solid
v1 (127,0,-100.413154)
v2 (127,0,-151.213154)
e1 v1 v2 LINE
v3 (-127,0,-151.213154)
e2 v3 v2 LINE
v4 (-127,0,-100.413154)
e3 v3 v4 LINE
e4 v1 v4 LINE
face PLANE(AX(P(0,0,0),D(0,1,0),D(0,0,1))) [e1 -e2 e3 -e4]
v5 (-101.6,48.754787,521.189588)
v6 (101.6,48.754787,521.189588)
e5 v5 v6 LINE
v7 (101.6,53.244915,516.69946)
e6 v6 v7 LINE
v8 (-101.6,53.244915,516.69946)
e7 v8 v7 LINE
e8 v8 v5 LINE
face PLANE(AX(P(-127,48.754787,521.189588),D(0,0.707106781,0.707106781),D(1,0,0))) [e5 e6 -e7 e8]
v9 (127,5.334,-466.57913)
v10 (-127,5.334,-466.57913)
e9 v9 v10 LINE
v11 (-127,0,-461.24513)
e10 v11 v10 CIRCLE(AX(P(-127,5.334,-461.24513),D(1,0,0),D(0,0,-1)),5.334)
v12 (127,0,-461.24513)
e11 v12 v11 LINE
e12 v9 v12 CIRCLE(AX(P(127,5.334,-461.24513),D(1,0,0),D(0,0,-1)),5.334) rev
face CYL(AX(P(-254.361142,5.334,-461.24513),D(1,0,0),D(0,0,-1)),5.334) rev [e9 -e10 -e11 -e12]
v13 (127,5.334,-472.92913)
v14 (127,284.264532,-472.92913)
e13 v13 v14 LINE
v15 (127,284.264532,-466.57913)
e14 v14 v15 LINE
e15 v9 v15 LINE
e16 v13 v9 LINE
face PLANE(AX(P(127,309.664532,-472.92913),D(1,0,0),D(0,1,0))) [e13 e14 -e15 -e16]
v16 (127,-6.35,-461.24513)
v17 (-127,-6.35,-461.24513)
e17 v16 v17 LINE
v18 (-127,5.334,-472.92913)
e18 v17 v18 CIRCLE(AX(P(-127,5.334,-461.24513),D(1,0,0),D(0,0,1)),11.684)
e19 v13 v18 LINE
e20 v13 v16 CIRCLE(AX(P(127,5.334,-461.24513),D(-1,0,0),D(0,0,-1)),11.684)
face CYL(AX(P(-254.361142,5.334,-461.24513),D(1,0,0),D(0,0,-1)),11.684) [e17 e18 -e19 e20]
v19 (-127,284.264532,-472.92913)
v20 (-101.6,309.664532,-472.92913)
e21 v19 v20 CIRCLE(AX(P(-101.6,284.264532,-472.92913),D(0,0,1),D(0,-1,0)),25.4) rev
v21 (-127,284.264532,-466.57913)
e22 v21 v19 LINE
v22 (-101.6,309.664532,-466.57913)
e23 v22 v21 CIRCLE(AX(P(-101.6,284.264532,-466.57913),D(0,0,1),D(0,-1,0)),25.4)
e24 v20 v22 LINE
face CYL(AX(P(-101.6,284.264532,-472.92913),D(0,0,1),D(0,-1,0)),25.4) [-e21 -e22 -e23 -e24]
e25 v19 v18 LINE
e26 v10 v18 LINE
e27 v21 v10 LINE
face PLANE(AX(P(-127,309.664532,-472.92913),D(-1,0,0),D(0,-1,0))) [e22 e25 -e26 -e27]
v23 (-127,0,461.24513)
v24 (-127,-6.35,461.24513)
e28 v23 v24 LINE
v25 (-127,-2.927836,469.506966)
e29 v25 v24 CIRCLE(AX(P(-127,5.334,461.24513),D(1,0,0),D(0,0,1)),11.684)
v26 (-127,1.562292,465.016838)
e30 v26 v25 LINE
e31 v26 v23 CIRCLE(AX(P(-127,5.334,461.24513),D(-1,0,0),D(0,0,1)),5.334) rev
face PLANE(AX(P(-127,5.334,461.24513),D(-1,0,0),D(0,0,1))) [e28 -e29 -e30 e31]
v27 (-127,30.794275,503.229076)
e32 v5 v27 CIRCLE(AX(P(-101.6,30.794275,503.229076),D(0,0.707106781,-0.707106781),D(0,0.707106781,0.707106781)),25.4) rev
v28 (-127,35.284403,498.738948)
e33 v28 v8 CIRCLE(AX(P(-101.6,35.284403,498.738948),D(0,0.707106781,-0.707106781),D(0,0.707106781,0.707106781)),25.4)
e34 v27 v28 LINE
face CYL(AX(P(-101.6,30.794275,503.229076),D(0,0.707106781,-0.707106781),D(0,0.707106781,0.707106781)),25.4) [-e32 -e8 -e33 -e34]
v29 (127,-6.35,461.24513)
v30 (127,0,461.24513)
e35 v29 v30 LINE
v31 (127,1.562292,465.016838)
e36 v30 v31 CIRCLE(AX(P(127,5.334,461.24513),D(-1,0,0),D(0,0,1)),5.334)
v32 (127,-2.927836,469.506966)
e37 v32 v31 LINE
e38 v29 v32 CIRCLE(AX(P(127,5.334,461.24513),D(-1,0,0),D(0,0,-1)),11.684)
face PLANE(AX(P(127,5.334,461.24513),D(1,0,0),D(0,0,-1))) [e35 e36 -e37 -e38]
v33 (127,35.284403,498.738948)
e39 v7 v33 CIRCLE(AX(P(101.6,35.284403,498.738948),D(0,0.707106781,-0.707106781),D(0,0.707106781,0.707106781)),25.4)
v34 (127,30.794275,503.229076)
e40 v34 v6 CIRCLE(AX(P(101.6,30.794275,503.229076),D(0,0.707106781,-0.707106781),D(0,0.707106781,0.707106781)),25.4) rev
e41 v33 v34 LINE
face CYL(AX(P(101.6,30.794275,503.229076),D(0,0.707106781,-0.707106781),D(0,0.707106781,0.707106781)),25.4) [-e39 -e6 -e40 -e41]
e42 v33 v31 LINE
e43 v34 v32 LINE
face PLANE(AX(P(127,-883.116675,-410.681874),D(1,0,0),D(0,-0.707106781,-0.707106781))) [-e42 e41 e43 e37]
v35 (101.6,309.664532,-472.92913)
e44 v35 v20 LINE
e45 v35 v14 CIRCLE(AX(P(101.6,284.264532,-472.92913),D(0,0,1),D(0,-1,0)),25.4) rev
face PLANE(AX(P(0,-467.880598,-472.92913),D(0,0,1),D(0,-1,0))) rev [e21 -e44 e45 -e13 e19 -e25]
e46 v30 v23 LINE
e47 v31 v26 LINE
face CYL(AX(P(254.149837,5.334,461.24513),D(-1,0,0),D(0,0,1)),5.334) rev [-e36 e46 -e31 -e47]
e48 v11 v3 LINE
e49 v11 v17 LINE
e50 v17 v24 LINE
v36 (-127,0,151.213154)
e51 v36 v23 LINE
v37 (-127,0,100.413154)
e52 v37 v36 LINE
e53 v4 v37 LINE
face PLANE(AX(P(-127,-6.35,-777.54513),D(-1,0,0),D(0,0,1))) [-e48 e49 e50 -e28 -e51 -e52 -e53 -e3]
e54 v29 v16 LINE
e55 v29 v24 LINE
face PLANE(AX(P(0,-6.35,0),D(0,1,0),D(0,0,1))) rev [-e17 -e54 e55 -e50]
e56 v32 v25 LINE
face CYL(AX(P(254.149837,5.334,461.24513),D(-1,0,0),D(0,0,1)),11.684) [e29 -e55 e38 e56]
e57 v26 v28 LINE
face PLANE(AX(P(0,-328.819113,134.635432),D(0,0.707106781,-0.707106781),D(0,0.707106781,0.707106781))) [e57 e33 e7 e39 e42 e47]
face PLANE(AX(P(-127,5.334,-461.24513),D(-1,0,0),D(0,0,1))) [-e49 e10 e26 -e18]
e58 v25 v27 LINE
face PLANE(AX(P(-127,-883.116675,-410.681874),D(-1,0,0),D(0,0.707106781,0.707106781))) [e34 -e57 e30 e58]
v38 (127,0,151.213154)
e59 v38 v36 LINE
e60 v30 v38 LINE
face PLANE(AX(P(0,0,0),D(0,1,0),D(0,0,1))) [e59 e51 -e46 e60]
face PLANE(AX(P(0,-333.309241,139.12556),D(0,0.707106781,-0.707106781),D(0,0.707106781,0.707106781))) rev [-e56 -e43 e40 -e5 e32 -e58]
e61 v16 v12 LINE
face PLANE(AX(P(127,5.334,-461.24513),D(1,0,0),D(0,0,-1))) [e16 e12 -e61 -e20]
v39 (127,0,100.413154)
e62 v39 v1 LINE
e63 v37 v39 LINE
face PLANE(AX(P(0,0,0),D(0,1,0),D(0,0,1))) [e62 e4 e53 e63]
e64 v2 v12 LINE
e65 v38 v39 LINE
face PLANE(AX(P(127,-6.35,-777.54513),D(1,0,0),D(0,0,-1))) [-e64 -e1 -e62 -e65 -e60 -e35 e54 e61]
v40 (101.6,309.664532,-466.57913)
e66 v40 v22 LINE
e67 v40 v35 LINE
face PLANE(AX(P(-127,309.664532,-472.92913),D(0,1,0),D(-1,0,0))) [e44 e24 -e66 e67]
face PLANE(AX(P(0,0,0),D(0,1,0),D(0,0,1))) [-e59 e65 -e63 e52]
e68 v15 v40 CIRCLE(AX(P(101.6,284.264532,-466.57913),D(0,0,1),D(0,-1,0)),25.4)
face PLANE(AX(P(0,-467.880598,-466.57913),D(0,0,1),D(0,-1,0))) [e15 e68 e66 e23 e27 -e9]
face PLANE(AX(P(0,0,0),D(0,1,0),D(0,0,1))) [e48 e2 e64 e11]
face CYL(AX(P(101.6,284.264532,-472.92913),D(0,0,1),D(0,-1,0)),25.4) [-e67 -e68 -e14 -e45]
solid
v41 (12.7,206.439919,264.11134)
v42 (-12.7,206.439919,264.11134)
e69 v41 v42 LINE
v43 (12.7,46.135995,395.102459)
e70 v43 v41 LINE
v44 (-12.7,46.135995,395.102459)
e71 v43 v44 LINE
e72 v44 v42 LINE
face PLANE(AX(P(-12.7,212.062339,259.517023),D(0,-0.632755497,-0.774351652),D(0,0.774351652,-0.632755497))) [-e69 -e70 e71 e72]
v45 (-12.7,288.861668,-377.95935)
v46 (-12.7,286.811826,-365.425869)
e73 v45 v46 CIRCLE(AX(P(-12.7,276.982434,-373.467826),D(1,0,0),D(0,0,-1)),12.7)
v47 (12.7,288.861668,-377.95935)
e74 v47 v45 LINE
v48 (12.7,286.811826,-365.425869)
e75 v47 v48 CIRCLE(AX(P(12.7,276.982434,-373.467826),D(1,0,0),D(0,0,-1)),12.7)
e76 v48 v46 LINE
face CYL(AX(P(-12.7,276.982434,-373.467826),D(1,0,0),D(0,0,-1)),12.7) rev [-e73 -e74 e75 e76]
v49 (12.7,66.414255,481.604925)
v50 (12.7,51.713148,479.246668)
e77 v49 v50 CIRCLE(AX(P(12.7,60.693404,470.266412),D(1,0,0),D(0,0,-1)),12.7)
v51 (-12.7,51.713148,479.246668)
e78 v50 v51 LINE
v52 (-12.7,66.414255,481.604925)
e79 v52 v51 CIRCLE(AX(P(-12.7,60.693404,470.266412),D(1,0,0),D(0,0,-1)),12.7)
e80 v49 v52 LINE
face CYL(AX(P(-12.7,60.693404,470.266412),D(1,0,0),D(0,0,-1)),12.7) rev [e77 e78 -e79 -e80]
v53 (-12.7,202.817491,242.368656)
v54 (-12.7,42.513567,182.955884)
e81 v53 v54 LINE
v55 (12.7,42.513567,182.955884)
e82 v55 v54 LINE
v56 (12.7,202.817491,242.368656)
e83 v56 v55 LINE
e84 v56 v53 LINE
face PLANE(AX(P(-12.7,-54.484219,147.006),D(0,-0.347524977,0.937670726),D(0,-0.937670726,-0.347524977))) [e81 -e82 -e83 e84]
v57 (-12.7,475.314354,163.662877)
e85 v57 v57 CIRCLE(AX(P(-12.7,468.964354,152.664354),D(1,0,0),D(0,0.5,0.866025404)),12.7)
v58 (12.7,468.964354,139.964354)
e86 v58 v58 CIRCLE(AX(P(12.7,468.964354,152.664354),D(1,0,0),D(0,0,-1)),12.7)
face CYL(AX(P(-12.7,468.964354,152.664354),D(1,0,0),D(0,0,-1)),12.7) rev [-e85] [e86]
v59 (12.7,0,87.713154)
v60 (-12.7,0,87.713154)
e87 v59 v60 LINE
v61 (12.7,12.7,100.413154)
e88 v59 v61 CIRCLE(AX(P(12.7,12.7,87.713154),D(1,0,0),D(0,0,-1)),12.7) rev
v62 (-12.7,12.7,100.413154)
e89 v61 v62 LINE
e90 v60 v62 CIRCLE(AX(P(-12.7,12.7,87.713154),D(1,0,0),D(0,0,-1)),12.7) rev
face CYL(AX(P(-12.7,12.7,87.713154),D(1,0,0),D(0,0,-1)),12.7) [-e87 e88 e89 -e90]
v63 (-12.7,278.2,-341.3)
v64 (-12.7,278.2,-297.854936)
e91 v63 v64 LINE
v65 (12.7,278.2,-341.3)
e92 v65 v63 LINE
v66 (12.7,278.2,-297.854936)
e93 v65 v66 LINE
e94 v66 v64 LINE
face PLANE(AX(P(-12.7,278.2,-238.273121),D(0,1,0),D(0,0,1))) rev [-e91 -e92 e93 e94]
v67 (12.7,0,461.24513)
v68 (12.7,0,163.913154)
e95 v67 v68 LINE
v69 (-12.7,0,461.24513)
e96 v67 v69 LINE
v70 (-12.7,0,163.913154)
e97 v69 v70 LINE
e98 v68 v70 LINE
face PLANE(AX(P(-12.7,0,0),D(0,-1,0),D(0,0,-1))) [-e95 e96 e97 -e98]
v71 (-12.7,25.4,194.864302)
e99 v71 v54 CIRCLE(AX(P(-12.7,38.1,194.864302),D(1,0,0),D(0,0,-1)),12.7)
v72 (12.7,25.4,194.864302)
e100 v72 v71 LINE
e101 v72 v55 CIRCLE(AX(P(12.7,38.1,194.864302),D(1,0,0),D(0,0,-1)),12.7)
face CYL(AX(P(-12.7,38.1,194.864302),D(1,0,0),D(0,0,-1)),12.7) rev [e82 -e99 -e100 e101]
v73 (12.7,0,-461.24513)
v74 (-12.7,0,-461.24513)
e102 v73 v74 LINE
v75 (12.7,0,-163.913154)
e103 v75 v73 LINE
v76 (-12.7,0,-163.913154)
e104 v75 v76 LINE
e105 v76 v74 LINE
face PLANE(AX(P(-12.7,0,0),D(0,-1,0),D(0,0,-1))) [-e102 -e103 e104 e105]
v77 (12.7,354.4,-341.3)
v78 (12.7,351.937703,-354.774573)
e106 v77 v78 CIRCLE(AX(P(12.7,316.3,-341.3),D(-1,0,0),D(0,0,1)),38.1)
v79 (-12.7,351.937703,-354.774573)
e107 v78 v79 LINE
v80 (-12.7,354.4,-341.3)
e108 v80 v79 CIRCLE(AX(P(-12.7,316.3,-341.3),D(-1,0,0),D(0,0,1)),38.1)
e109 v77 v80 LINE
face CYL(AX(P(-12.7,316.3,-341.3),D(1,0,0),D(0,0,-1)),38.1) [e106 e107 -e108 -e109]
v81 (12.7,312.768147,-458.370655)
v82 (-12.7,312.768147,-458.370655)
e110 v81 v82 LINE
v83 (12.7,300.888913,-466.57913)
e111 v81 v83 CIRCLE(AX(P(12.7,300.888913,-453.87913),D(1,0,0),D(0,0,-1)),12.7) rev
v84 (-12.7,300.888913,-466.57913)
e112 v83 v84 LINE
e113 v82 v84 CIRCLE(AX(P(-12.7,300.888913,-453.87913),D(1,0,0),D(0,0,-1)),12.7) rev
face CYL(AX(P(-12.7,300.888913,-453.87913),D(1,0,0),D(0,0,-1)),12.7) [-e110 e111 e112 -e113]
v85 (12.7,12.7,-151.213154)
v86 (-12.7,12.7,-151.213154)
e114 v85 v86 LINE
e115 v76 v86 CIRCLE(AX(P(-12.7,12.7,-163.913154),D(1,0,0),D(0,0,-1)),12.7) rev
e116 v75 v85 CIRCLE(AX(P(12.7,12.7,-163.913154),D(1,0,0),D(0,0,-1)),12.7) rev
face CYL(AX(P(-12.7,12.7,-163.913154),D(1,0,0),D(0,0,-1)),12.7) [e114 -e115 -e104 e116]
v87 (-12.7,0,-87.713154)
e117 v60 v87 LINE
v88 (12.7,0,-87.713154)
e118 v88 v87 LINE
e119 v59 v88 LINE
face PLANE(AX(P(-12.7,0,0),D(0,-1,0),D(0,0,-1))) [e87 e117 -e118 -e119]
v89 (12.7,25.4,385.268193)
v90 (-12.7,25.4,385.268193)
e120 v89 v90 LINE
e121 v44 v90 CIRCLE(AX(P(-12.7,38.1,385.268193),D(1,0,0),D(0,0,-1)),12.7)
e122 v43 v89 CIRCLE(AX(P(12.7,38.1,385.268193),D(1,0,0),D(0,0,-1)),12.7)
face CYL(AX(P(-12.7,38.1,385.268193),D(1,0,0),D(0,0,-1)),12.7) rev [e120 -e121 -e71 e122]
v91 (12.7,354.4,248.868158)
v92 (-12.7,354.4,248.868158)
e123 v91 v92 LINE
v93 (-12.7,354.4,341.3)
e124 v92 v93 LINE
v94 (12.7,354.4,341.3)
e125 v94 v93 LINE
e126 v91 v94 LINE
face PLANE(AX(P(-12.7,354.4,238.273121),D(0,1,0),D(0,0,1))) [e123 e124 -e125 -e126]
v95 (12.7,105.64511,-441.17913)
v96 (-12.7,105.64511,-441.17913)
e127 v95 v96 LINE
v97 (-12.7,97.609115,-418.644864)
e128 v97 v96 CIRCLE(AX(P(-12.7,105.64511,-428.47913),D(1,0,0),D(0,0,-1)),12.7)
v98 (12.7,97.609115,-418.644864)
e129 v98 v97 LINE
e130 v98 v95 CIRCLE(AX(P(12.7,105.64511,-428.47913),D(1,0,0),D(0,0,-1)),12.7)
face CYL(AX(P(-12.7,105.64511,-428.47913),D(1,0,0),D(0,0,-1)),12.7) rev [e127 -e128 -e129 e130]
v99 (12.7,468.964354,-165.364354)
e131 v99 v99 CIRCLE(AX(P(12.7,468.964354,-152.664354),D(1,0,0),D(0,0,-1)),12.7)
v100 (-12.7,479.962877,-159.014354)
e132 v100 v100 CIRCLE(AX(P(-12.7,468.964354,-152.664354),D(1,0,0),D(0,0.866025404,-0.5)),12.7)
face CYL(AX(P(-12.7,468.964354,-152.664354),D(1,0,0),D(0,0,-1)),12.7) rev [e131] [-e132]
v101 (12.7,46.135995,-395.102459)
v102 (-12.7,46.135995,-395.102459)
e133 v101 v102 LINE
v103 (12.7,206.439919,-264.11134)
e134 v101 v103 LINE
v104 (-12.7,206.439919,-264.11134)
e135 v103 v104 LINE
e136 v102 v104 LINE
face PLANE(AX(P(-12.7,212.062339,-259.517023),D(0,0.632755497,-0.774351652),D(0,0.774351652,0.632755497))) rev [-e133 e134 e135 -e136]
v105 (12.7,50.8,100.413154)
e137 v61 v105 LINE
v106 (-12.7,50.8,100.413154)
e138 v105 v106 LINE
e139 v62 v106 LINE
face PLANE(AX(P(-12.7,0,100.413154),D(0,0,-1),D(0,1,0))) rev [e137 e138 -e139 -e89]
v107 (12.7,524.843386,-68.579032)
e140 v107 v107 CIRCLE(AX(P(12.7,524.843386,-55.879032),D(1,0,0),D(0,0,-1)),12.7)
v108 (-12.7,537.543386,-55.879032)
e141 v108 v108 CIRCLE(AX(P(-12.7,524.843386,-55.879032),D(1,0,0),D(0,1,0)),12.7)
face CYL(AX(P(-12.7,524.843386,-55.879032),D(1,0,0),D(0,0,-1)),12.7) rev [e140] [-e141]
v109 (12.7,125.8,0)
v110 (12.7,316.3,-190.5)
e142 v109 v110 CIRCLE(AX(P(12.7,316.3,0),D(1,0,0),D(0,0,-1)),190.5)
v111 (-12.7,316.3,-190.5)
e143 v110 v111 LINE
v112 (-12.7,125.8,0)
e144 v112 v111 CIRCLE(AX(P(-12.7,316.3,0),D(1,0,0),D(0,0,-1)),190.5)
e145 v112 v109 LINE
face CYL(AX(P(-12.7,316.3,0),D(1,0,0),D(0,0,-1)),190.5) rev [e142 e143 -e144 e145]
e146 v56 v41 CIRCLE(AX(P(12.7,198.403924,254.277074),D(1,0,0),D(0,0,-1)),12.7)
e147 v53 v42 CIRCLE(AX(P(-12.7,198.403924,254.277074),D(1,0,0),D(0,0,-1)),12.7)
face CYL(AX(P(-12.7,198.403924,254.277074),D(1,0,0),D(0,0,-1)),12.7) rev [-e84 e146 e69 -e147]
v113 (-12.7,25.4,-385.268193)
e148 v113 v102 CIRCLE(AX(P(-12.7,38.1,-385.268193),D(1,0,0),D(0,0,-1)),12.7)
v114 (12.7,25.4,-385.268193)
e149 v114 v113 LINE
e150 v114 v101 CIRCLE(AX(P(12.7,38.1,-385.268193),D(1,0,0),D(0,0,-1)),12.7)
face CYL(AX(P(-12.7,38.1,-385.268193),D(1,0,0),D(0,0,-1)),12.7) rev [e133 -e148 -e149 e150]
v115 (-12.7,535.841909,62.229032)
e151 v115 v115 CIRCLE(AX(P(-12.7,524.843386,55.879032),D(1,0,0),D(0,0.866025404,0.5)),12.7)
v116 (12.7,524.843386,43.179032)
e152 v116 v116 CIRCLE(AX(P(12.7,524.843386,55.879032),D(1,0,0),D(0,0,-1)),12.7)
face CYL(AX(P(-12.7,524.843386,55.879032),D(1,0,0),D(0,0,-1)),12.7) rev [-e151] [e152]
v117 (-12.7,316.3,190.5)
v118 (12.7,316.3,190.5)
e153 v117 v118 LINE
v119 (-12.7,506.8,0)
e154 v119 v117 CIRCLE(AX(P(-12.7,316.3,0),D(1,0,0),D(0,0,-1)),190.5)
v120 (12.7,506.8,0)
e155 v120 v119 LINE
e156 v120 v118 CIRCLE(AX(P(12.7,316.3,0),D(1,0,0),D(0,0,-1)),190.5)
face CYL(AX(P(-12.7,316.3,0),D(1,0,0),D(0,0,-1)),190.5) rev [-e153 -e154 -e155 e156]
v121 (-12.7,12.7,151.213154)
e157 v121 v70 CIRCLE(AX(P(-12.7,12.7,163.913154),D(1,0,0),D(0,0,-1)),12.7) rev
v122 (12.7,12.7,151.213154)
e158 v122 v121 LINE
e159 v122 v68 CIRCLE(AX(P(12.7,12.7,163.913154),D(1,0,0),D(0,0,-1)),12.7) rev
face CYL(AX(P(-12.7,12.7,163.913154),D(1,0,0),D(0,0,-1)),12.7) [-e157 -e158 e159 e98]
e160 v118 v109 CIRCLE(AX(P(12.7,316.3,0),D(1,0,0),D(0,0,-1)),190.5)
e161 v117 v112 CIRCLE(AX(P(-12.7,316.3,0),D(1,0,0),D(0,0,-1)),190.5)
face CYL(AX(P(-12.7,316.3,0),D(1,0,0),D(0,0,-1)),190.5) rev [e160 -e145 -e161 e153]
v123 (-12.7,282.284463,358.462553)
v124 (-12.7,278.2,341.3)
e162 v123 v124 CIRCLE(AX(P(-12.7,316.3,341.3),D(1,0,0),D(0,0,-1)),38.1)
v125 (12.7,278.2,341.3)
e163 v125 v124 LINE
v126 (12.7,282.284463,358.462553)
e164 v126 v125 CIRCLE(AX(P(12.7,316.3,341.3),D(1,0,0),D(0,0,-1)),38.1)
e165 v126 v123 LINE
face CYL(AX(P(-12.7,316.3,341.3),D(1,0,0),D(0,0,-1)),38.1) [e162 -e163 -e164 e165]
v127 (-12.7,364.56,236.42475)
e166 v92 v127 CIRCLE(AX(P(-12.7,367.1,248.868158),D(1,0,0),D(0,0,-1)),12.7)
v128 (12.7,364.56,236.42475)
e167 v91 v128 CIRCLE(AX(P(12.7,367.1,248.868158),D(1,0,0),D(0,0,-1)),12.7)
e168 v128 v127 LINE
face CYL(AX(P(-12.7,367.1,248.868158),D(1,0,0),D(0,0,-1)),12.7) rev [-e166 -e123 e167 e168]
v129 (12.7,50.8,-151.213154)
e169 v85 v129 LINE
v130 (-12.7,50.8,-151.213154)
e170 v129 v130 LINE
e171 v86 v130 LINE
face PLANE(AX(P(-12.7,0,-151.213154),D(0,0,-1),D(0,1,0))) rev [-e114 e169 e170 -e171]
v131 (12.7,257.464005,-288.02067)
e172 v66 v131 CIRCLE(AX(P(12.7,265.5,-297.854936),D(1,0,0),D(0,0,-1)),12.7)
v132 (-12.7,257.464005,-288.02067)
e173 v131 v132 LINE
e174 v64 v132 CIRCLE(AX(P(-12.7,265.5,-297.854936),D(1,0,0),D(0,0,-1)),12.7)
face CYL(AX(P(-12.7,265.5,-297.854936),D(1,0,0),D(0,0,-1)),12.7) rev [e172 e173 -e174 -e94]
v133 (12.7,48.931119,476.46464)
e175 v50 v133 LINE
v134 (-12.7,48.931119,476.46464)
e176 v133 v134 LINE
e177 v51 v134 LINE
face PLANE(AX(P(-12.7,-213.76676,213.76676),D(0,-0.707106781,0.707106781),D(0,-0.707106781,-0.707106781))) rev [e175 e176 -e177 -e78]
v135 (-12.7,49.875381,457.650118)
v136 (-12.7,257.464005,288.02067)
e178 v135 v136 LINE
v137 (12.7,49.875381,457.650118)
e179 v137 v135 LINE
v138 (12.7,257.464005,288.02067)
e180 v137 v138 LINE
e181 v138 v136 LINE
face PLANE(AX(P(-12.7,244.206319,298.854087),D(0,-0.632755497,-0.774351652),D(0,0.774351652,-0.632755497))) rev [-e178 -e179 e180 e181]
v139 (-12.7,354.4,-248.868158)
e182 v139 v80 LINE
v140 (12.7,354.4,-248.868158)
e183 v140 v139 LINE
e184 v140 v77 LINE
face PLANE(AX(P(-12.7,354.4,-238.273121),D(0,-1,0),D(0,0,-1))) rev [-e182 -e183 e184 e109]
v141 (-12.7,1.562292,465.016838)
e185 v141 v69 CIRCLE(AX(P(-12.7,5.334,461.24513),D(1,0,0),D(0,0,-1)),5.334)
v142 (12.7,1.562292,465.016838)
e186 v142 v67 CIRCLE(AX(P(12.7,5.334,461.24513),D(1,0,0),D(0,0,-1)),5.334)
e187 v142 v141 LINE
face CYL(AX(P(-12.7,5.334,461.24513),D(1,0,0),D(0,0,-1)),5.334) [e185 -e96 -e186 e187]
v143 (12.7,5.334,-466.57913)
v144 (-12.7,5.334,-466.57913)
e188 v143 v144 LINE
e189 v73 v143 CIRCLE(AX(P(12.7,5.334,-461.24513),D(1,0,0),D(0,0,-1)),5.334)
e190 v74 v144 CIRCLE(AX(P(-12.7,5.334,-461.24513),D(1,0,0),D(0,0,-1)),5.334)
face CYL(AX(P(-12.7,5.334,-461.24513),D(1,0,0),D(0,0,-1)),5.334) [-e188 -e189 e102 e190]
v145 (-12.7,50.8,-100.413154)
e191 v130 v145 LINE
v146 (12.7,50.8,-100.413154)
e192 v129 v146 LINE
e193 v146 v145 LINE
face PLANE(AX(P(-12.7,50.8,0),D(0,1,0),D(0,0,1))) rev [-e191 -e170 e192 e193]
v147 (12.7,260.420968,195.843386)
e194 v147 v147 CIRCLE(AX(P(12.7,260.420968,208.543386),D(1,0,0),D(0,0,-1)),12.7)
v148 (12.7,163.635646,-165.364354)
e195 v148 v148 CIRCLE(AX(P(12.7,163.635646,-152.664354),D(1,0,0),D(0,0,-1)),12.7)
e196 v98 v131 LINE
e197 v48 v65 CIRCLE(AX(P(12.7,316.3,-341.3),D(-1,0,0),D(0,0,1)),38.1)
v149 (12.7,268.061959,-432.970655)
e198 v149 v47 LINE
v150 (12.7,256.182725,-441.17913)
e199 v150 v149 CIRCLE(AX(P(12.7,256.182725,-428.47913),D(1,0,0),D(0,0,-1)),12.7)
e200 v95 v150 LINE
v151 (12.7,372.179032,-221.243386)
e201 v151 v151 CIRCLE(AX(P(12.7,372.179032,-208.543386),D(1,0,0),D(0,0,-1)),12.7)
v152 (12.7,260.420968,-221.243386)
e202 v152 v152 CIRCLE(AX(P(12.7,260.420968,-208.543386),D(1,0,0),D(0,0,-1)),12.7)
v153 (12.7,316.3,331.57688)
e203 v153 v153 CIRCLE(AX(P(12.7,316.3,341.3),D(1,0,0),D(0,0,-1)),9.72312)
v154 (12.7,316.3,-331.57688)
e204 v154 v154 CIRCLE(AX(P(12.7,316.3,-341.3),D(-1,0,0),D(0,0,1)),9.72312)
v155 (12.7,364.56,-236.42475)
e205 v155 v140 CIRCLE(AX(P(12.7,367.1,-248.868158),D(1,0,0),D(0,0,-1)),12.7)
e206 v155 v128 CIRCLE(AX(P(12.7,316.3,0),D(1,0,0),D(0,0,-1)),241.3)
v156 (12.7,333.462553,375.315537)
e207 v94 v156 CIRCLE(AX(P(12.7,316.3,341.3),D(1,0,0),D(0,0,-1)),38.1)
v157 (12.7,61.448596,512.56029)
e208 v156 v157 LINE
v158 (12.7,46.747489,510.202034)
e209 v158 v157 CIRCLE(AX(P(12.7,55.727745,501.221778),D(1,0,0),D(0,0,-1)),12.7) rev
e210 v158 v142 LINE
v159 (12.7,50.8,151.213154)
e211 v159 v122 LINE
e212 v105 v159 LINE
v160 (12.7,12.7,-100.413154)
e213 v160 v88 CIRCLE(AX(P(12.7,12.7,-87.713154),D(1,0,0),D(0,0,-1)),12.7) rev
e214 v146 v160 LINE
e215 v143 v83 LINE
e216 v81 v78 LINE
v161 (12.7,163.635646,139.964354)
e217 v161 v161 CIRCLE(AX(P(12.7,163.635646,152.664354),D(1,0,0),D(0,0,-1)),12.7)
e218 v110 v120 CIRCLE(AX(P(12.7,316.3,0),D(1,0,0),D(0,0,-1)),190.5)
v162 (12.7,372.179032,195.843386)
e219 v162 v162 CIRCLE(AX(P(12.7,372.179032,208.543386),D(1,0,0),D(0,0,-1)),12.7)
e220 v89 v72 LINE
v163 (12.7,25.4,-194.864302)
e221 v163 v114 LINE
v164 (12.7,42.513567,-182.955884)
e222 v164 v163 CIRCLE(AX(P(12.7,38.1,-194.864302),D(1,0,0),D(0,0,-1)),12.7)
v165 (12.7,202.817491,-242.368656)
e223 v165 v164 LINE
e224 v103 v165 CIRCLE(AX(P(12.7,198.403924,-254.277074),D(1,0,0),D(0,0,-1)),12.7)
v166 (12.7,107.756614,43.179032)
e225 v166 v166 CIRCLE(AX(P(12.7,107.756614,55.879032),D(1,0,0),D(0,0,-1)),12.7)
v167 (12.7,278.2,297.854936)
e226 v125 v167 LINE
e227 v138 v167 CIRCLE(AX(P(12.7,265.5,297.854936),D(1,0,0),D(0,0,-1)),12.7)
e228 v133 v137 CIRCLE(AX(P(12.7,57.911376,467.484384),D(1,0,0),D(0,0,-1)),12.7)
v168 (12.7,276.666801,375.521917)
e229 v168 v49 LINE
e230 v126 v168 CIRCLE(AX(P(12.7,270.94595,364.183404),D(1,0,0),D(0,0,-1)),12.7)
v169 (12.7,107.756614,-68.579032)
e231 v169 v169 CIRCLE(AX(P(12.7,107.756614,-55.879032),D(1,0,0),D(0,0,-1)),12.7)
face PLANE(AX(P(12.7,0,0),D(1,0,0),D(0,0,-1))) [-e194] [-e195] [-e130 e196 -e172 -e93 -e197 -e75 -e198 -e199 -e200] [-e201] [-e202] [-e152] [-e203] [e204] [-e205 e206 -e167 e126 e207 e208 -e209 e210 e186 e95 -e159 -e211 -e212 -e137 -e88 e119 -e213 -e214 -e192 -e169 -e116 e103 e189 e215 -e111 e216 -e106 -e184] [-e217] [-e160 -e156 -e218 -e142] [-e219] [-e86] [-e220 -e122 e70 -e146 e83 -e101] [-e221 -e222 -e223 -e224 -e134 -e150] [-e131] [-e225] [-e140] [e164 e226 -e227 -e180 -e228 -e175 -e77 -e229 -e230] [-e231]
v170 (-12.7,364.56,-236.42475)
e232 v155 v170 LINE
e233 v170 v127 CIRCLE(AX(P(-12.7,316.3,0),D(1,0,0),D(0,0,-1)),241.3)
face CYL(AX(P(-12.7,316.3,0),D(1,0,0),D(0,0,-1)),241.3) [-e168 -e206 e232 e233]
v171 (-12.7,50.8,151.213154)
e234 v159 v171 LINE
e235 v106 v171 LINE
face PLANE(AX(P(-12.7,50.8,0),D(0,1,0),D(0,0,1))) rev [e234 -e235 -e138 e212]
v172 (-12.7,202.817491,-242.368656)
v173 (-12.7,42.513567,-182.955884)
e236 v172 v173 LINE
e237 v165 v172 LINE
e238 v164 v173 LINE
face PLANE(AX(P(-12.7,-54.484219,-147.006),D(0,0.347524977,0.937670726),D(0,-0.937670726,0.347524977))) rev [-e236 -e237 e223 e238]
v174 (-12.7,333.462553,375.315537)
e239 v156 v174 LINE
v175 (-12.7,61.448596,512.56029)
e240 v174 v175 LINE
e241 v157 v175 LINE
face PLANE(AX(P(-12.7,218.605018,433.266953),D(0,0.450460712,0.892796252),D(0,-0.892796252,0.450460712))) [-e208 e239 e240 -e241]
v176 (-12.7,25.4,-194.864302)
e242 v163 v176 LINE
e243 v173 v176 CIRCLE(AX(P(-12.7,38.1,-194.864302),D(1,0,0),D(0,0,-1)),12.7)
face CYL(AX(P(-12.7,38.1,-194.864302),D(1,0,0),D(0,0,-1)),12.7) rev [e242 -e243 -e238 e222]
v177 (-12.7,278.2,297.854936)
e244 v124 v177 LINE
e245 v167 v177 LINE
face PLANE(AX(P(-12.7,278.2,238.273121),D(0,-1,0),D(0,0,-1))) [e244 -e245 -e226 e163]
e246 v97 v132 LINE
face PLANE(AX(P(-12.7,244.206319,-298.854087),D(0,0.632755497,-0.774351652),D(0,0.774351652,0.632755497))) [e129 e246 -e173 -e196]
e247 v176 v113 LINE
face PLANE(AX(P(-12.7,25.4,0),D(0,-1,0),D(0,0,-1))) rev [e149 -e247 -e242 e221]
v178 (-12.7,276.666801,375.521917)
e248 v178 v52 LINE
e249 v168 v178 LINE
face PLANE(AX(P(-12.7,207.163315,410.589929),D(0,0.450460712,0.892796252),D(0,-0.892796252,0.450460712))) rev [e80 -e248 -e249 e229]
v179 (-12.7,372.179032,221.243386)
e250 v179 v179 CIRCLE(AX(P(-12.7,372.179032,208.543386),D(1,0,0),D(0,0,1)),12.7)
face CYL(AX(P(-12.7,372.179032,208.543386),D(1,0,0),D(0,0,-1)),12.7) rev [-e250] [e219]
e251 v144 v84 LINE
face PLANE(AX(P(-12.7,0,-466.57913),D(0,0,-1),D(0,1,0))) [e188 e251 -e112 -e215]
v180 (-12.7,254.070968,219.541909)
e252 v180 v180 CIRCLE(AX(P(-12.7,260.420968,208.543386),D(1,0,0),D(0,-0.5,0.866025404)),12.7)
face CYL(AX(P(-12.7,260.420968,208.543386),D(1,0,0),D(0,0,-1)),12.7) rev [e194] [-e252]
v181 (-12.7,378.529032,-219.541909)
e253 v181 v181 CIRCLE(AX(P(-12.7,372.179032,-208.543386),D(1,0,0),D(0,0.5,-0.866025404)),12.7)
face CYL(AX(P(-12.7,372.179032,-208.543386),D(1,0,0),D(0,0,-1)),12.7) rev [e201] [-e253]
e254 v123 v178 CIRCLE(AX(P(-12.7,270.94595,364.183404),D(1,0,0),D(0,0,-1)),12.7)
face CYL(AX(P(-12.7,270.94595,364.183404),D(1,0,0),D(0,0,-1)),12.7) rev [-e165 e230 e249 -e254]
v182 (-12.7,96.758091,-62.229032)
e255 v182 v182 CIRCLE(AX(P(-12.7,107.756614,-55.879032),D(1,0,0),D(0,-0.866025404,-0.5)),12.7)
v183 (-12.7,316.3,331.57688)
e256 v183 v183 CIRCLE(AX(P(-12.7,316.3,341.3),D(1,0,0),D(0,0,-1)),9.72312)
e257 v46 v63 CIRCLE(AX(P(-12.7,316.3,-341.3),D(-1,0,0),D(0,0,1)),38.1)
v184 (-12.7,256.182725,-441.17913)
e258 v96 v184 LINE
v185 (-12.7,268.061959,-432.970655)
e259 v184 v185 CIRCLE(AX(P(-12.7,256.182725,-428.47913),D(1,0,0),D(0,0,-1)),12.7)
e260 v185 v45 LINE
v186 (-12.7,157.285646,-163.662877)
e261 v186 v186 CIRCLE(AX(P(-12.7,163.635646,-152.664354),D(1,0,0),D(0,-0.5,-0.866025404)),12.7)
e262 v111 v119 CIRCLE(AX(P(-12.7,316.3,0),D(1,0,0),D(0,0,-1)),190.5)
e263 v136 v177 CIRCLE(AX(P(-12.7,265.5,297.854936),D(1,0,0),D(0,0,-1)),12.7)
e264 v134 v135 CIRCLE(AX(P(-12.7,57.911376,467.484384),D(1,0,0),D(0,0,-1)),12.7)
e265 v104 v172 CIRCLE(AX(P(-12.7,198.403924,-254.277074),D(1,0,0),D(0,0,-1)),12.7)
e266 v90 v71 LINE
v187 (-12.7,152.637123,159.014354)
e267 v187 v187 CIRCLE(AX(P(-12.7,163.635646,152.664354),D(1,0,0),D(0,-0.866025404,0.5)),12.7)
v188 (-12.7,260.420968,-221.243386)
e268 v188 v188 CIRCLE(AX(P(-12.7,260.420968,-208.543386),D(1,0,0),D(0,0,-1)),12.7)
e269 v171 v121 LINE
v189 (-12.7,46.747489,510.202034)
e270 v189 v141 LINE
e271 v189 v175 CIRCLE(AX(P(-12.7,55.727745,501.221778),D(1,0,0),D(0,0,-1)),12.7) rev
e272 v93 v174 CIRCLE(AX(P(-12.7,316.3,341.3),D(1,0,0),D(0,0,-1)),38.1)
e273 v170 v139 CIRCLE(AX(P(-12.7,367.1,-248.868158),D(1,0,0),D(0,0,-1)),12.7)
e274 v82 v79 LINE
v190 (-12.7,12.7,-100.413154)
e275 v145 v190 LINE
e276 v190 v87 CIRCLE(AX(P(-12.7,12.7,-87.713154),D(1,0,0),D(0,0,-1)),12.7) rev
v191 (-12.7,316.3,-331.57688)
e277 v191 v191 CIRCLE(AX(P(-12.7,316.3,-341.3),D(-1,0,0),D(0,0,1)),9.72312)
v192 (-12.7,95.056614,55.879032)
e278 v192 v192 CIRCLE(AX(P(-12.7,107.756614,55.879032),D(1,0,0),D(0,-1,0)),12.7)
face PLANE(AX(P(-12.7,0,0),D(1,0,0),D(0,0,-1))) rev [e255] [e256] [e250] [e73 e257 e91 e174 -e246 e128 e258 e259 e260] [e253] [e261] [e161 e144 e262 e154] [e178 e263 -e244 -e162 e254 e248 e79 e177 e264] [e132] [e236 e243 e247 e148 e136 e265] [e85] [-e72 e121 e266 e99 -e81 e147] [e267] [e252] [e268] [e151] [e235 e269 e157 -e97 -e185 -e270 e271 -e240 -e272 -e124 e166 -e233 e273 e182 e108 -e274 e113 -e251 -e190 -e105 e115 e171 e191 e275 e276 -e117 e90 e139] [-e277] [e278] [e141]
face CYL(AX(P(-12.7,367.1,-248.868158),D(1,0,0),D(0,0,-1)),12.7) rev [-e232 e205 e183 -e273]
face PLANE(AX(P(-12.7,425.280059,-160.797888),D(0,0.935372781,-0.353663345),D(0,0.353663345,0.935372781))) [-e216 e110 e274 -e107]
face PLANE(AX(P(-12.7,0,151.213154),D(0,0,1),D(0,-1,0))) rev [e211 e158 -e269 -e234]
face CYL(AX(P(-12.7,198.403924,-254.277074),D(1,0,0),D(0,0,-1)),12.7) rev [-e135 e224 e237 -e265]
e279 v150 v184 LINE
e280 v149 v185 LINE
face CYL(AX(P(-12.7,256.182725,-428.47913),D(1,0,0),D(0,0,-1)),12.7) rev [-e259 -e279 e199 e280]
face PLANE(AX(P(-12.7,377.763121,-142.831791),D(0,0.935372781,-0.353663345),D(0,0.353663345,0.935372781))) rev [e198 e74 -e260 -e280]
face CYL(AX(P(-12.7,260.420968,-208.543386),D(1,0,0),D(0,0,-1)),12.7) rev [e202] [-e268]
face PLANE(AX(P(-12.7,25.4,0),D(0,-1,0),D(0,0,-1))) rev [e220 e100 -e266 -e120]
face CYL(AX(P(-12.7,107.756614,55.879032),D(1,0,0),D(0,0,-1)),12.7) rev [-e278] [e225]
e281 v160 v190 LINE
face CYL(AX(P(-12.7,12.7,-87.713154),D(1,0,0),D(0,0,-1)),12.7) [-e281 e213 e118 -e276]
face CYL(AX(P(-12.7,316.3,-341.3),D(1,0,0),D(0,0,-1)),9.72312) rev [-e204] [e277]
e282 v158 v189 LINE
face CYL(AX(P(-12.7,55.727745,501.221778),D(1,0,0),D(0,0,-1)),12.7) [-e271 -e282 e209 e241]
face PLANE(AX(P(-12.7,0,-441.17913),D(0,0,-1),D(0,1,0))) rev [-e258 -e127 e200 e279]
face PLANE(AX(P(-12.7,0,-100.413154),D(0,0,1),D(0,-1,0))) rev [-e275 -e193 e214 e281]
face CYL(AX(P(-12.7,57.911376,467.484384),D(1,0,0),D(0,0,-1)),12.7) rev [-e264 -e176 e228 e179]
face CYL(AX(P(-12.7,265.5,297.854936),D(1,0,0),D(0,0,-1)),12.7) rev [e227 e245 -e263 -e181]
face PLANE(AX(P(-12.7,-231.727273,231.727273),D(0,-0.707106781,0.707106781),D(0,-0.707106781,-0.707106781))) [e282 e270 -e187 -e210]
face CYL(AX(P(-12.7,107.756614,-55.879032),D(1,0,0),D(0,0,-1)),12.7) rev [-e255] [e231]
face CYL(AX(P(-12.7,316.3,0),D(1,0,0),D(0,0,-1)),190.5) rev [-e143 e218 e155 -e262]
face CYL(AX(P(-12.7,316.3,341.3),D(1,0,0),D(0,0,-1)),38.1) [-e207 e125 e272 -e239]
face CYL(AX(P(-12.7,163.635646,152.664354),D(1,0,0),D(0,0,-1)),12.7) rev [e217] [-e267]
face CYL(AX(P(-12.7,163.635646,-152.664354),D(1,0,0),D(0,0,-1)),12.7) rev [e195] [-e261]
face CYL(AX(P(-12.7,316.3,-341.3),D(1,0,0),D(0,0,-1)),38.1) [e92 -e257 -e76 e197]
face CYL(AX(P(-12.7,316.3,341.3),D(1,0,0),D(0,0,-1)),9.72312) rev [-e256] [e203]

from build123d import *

# Parameters (mm, degrees)
FLANGE_PROFILE_DEPTH                = 12.7
F_7_8_1_DIAMETER_HOLE1_D            = 25.4
BOLT_PATTERN_COUNT                  = 12
SKETCH15_R                          = 9.72312
BOSS_EXTRUDE1_DEPTH                 = 12.7
SKETCH5_W                           = 254
SKETCH5_H                           = 1317.865260112
BASE_SKID_DEPTH                     = 6.35
BEND_START                          = -127
BEND_HEEL_DEPTH                     = 254
BEND_HEEL_2_DEPTH                   = 254
BEND_TOE_DEPTH                      = 254
BEND_TOE_2_DEPTH                    = 254
WEBBING_EXTRUDE_DEPTH               = 12.7
WEBBING_FILLET_R                    = 12.7
SKID_START                          = -472.929130056
SKID_EDGES_DEPTH                    = 6.35
SKID_START_2                        = -334.061851681
SKID_EDGES_2_DEPTH                  = 6.35
FLANGE_FILLET_R                     = 12.7
CONVERT_START                       = -12.7
CONVERT_FLANGE_TO_SHEET_OUTLINE_R   = 12.7
CONVERT_FLANGE_TO_SHEET_OUTLINE_R_2 = 9.72312
CONVERT_FLANGE_TO_SHEET_OUTLINE_R_3 = 190.5
CONVERT_FLANGE_TO_SHEET_DEPTH       = 25.4


# Read off the part's stored shape, not the designer's step: Bend Heel, Bend Toe, Skid Edges, Convert Flange to Sheet
# Sheet-metal steps are written as plain solids
with BuildPart() as part:
    # Sketch1 → Flange Profile (new, symmetric)
    with BuildSketch(Plane(origin=(0, 0, 0), x_dir=(0, 0, -1), z_dir=(1, 0, 0))):
        with BuildLine():
            ThreePointArc((-190.5, 316.3), (0, 506.8), (190.5, 316.3))
            Line((190.5, 316.3), (241.3, 316.3))
            ThreePointArc((241.3, 316.3), (0, 557.6), (-241.3, 316.3))
            Line((-241.3, 316.3), (-190.5, 316.3))
        make_face()
        with BuildLine():
            Line((241.3, 316.3), (190.5, 316.3))
            ThreePointArc((190.5, 316.3), (0, 125.8), (-190.5, 316.3))
            Line((-190.5, 316.3), (-241.3, 316.3))
            ThreePointArc((-241.3, 316.3), (0, 75), (241.3, 316.3))
        make_face()
    extrude(amount=FLANGE_PROFILE_DEPTH, both=True)

    # 7/8 (1) Diameter Hole1 (through all)
    with Locations(Plane(origin=(12.7, 260.420968162, -208.543385896), x_dir=(0, 0, 1), z_dir=(1, 0, 0))):
        with Locations((0, 0)):
            f_7_8_1_diameter_hole1 = Hole(F_7_8_1_DIAMETER_HOLE1_D / 2)

    # Bolt Pattern: 7/8 (1) Diameter Hole1 ×12 about axis
    bolt_pattern_axis = Axis((0, 316.3, 0), (1, 0, 0))
    for i in range(1, BOLT_PATTERN_COUNT):
        add(f_7_8_1_diameter_hole1.rotate(bolt_pattern_axis, i * 360 / BOLT_PATTERN_COUNT), mode=Mode.SUBTRACT)

    # Sketch15 → Boss-Extrude1 (add, symmetric)
    with BuildSketch(Plane(origin=(0, 0, 0), x_dir=(0, 0, -1), z_dir=(1, 0, 0))):
        with BuildLine():
            Line((-238.273120599, 278.2), (-341.3, 278.2))
            ThreePointArc((-341.3, 278.2), (-379.4, 316.3), (-341.3, 354.4))
            Line((-341.3, 354.4), (-238.273120599, 354.4))
            ThreePointArc((-238.273120599, 354.4), (-200.173120599, 316.3), (-238.273120599, 278.2))
        make_face()
        with Locations((-341.3, 316.3)):
            Circle(SKETCH15_R, mode=Mode.SUBTRACT)
    boss_extrude1 = extrude(amount=BOSS_EXTRUDE1_DEPTH, both=True)

    # Mirror2: Boss-Extrude1 across plane
    add(boss_extrude1.mirror(Plane.XY))

    # webbing → Webbing Extrude (add, symmetric)
    with BuildSketch(Plane(origin=(0, 0, 0), x_dir=(0, 0, -1), z_dir=(1, 0, 0))):
        with BuildLine():
            ThreePointArc((238.273120599, 278.2), (0, 75), (-238.273120599, 278.2))
            Line((-238.273120599, 278.2), (-271.07641131, 278.2))
            Line((-271.07641131, 278.2), (-466.535353829, 39.001833116))
            Line((-466.535353829, 39.001833116), (-485.744094857, 58.210574144))
            Line((-485.744094857, 58.210574144), (-380.664844281, 266.473711409))
            Line((-380.664844281, 266.473711409), (-368.819522655, 289.950695021))
            ThreePointArc((-368.819522655, 289.950695021), (-378.982374479, 310.674286388), (-375.315537192, 333.462553119))
            Line((-375.315537192, 333.462553119), (-516.69946035, 53.244915153))
            Line((-516.69946035, 53.244915153), (-465.016837626, 1.562292429))
            ThreePointArc((-465.016837626, 1.562292429), (-463.286363484, 0.406026574), (-461.245130056, 0))
            Line((-461.245130056, 0), (-151.213153751, 0))
            Line((-151.213153751, 0), (-151.213153751, 50.8))
            Line((-151.213153751, 50.8), (-100.413153751, 50.8))
            Line((-100.413153751, 50.8), (-100.413153751, 0))
            Line((-100.413153751, 0), (100.413153751, 0))
            Line((100.413153751, 0), (100.413153751, 50.8))
            Line((100.413153751, 50.8), (151.213153751, 50.8))
            Line((151.213153751, 50.8), (151.213153751, 0))
            Line((151.213153751, 0), (176.613153751, 0))
            Line((176.613153751, 0), (461.245130056, 0))
            ThreePointArc((461.245130056, 0), (465.016837626, 1.562292429), (466.579130056, 5.334))
            Line((466.579130056, 5.334), (466.579130056, 309.66453199))
            Line((466.579130056, 309.66453199), (354.774573435, 351.937702939))
            ThreePointArc((354.774573435, 351.937702939), (378.177611201, 325.873494246), (370.408024073, 291.716816021))
            Line((370.408024073, 291.716816021), (441.179130056, 264.958344347))
            Line((441.179130056, 264.958344347), (441.179130056, 70.03219769))
            Line((441.179130056, 70.03219769), (271.07641131, 278.2))
            Line((271.07641131, 278.2), (238.273120599, 278.2))
        make_face()
        Polygon((-176.613153751, 25.4), (-412.046717792, 25.4), (-250.076782577, 223.615088522), align=None, mode=Mode.SUBTRACT)
        Polygon((412.046717792, 25.4), (176.613153751, 25.4), (250.076782577, 223.615088522), align=None, mode=Mode.SUBTRACT)
    extrude(amount=WEBBING_EXTRUDE_DEPTH, both=True)

    # Webbing Fillet
    webbing_fillet_edges = [part.edges().sort_by_distance(p)[0] for p in [
        (0, 223.615088522, 250.076782577),
        (0, 289.950695021, 368.819522655),
        (0, 291.716816021, -370.408024073),
        (0, 264.958344347, -441.179130056),
        (0, 70.03219769, -441.179130056),
        (0, 278.2, -271.07641131),
        (0, 278.2, 271.07641131),
        (0, 39.001833116, 466.535353829),
        (0, 25.4, -412.046717792),
        (0, 25.4, -176.613153751),
        (0, 58.210574144, 485.744094857),
        (0, 223.615088522, -250.076782577),
        (0, 25.4, 176.613153751),
        (0, 25.4, 412.046717792),
    ]]
    fillet(webbing_fillet_edges, radius=WEBBING_FILLET_R)

    # Flange Fillet
    flange_fillet_edges = [part.edges().sort_by_distance(p)[0] for p in [
        (0, 53.244915153, 516.69946035),
        (0, 0, 151.213153751),
        (0, 0, 100.413153751),
        (0, 0, -100.413153751),
        (0, 0, -151.213153751),
        (0, 309.66453199, -466.579130056),
        (0, 354.4, 238.273120599),
        (0, 354.4, -238.273120599),
    ]]
    fillet(flange_fillet_edges, radius=FLANGE_FILLET_R)


with BuildPart() as body_2:
    # Sketch5 → Base Skid (new body)
    with BuildSketch(Plane(origin=(0, 0, 0), x_dir=(1, 0, 0), z_dir=(0, 1, 0))):
        with Locations((0, 118.6125)):
            Rectangle(SKETCH5_W, SKETCH5_H)
    extrude(amount=-BASE_SKID_DEPTH)

    # Bend Heel outline → Bend Heel (cut)
    with BuildSketch(Plane.YZ.offset(BEND_START)):
        with BuildLine():
            Line((0, -777.545130056), (0, -471.640528076))
            ThreePointArc((0, -471.640528076), (-4.636915504, -467.33583609), (-6.35, -461.245130056))
            Line((-6.35, -461.245130056), (-6.35, -777.545130056))
            Line((-6.35, -777.545130056), (0, -777.545130056))
        make_face()
    extrude(amount=BEND_HEEL_DEPTH, mode=Mode.SUBTRACT)

    # Bend Heel 2 outline → Bend Heel 2 (add)
    with BuildSketch(Plane.YZ.offset(BEND_START)):
        with BuildLine():
            Line((5.334, -472.929130056), (309.66453199, -472.929130056))
            Line((309.66453199, -472.929130056), (309.66453199, -466.579130056))
            Line((309.66453199, -466.579130056), (5.334, -466.579130056))
            ThreePointArc((5.334, -466.579130056), (1.56229243, -465.016837626), (0, -461.245130056))
            Line((0, -461.245130056), (0, -471.640528076))
            ThreePointArc((0, -471.640528076), (2.590277571, -472.602411563), (5.334, -472.929130056))
        make_face()
    extrude(amount=BEND_HEEL_2_DEPTH)

    # Bend Toe outline → Bend Toe (cut)
    with BuildSketch(Plane.YZ.offset(BEND_START)):
        with BuildLine():
            Line((-6.35, 540.320130056), (-6.35, 461.245130056))
            ThreePointArc((-6.35, 461.245130056), (-5.460608458, 465.71640328), (-2.927835631, 469.506965687))
            Line((-2.927835631, 469.506965687), (0, 472.434801318))
            Line((0, 472.434801318), (0, 540.320130056))
            Line((0, 540.320130056), (-6.35, 540.320130056))
        make_face()
    extrude(amount=BEND_TOE_DEPTH, mode=Mode.SUBTRACT)

    # Bend Toe 2 outline → Bend Toe 2 (add)
    with BuildSketch(Plane.YZ.offset(BEND_START)):
        with BuildLine():
            Line((48.754787092, 521.189588411), (0, 472.434801318))
            Line((0, 472.434801318), (0, 461.245130056))
            ThreePointArc((0, 461.245130056), (0.406026574, 463.286363484), (1.562292429, 465.016837626))
            Line((1.562292429, 465.016837626), (53.244915153, 516.69946035))
            Line((53.244915153, 516.69946035), (48.754787092, 521.189588411))
        make_face()
    extrude(amount=BEND_TOE_2_DEPTH)

    # Skid Edges outline → Skid Edges (cut)
    with BuildSketch(Plane.XY.offset(SKID_START)):
        with BuildLine():
            ThreePointArc((-127, 284.26453199), (-119.560512242, 302.225044232), (-101.6, 309.66453199))
            Line((-101.6, 309.66453199), (-127, 309.66453199))
            Line((-127, 309.66453199), (-127, 284.26453199))
        make_face()
        with BuildLine():
            ThreePointArc((101.6, 309.66453199), (119.560512242, 302.225044232), (127, 284.26453199))
            Line((127, 284.26453199), (127, 309.66453199))
            Line((127, 309.66453199), (101.6, 309.66453199))
        make_face()
    extrude(amount=SKID_EDGES_DEPTH, mode=Mode.SUBTRACT)

    # Skid Edges 2 outline → Skid Edges 2 (cut)
    with BuildSketch(Plane(origin=(0, 0, 0), x_dir=(1, 0, 0), z_dir=(0, 0.707106781186546, -0.707106781186549)).offset(SKID_START_2)):
        with BuildLine():
            Line((-127, -403.011532817), (-101.6, -403.011532817))
            ThreePointArc((-101.6, -403.011532817), (-119.560512242, -395.572045059), (-127, -377.611532817))
            Line((-127, -377.611532817), (-127, -403.011532817))
        make_face()
        with BuildLine():
            ThreePointArc((127, -377.611532817), (119.560512242, -395.572045059), (101.6, -403.011532817))
            Line((101.6, -403.011532817), (127, -403.011532817))
            Line((127, -403.011532817), (127, -377.611532817))
        make_face()
    extrude(amount=SKID_EDGES_2_DEPTH, mode=Mode.SUBTRACT)


with BuildPart() as body_3:
    # Convert Flange to Sheet outline → Convert Flange to Sheet (new body)
    with BuildSketch(Plane.YZ.offset(CONVERT_START)):
        with BuildLine():
            ThreePointArc((354.4, 341.3), (348.746134391, 361.271438683), (333.462553119, 375.315537192))
            Line((333.462553119, 375.315537192), (61.448595688, 512.560290001))
            ThreePointArc((61.448595688, 512.560290001), (53.716209529, 513.761463663), (46.747488527, 510.202033725))
            Line((46.747488527, 510.202033725), (1.562292429, 465.016837626))
            ThreePointArc((1.562292429, 465.016837626), (0.406026574, 463.286363484), (0, 461.245130056))
            Line((0, 461.245130056), (0, 163.913153751))
            ThreePointArc((0, 163.913153751), (3.719743879, 154.93289763), (12.7, 151.213153751))
            Line((12.7, 151.213153751), (50.8, 151.213153751))
            Line((50.8, 151.213153751), (50.8, 100.413153751))
            Line((50.8, 100.413153751), (12.7, 100.413153751))
            ThreePointArc((12.7, 100.413153751), (3.719743879, 96.693409872), (0, 87.713153751))
            Line((0, 87.713153751), (0, -87.713153751))
            ThreePointArc((0, -87.713153751), (3.719743879, -96.693409872), (12.7, -100.413153751))
            Line((12.7, -100.413153751), (50.8, -100.413153751))
            Line((50.8, -100.413153751), (50.8, -151.213153751))
            Line((50.8, -151.213153751), (12.7, -151.213153751))
            ThreePointArc((12.7, -151.213153751), (3.719743879, -154.93289763), (0, -163.913153751))
            Line((0, -163.913153751), (0, -461.245130056))
            ThreePointArc((0, -461.245130056), (1.56229243, -465.016837626), (5.334, -466.579130056))
            Line((5.334, -466.579130056), (300.888912587, -466.579130056))
            ThreePointArc((300.888912587, -466.579130056), (308.108595375, -464.327392133), (312.7681469, -458.370654534))
            Line((312.7681469, -458.370654534), (351.937702939, -354.774573435))
            ThreePointArc((351.937702939, -354.774573435), (353.779370872, -348.148850927), (354.4, -341.3))
            Line((354.4, -341.3), (354.4, -248.868157867))
            ThreePointArc((354.4, -248.868157867), (357.262622301, -240.83597261), (364.56, -236.424749973))
            ThreePointArc((364.56, -236.424749973), (557.6, 0), (364.56, 236.424749973))
            ThreePointArc((364.56, 236.424749973), (357.262622301, 240.83597261), (354.4, 248.868157867))
            Line((354.4, 248.868157867), (354.4, 341.3))
        make_face()
        with BuildLine():
            ThreePointArc((46.135994814, -395.102459099), (32.65790179, -396.74310345), (25.4, -385.26819312))
            Line((25.4, -385.26819312), (25.4, -194.864301774))
            ThreePointArc((25.4, -194.864301774), (30.846114958, -184.439756133), (42.513567213, -182.955883556))
            Line((42.513567213, -182.955883556), (202.817491303, -242.368656148))
            ThreePointArc((202.817491303, -242.368656148), (210.931253322, -252.189965766), (206.439918904, -264.111340345))
            Line((206.439918904, -264.111340345), (46.135994814, -395.102459099))
        make_face(mode=Mode.SUBTRACT)
        with BuildLine():
            ThreePointArc((257.464005186, -288.020670003), (270.94209821, -286.380025652), (278.2, -297.854935982))
            Line((278.2, -297.854935982), (278.2, -341.3))
            ThreePointArc((278.2, -341.3), (280.417487243, -354.108406547), (286.811825631, -365.42586936))
            ThreePointArc((286.811825631, -365.42586936), (289.515915106, -371.417982957), (288.861668487, -377.959350292))
            Line((288.861668487, -377.959350292), (268.061959257, -432.970654534))
            ThreePointArc((268.061959257, -432.970654534), (263.402407732, -438.927392133), (256.182724944, -441.179130056))
            Line((256.182724944, -441.179130056), (105.645109911, -441.179130056))
            ThreePointArc((105.645109911, -441.179130056), (93.682978455, -432.744972415), (97.609115097, -418.644864077))
            Line((97.609115097, -418.644864077), (257.464005186, -288.020670003))
        make_face(mode=Mode.SUBTRACT)
        with Locations((107.756614104, -55.879031838)):
            Circle(CONVERT_FLANGE_TO_SHEET_OUTLINE_R, mode=Mode.SUBTRACT)
        with Locations((163.635645942, -152.664354058)):
            Circle(CONVERT_FLANGE_TO_SHEET_OUTLINE_R, mode=Mode.SUBTRACT)
        with Locations((260.420968162, -208.543385896)):
            Circle(CONVERT_FLANGE_TO_SHEET_OUTLINE_R, mode=Mode.SUBTRACT)
        with Locations((316.3, -341.3)):
            Circle(CONVERT_FLANGE_TO_SHEET_OUTLINE_R_2, mode=Mode.SUBTRACT)
        with Locations((372.179031838, -208.543385896)):
            Circle(CONVERT_FLANGE_TO_SHEET_OUTLINE_R, mode=Mode.SUBTRACT)
        with Locations((316.3, 0)):
            Circle(CONVERT_FLANGE_TO_SHEET_OUTLINE_R_3, mode=Mode.SUBTRACT)
        with Locations((468.964354058, -152.664354058)):
            Circle(CONVERT_FLANGE_TO_SHEET_OUTLINE_R, mode=Mode.SUBTRACT)
        with Locations((524.843385896, -55.879031838)):
            Circle(CONVERT_FLANGE_TO_SHEET_OUTLINE_R, mode=Mode.SUBTRACT)
        with Locations((107.756614104, 55.879031838)):
            Circle(CONVERT_FLANGE_TO_SHEET_OUTLINE_R, mode=Mode.SUBTRACT)
        with Locations((163.635645942, 152.664354058)):
            Circle(CONVERT_FLANGE_TO_SHEET_OUTLINE_R, mode=Mode.SUBTRACT)
        with Locations((260.420968162, 208.543385896)):
            Circle(CONVERT_FLANGE_TO_SHEET_OUTLINE_R, mode=Mode.SUBTRACT)
        with BuildLine():
            Line((46.135994814, 395.102459099), (206.439918904, 264.111340345))
            ThreePointArc((206.439918904, 264.111340345), (210.931253322, 252.189965766), (202.817491303, 242.368656148))
            Line((202.817491303, 242.368656148), (42.513567213, 182.955883556))
            ThreePointArc((42.513567213, 182.955883556), (30.846114958, 184.439756133), (25.4, 194.864301774))
            Line((25.4, 194.864301774), (25.4, 385.26819312))
            ThreePointArc((25.4, 385.26819312), (32.65790179, 396.74310345), (46.135994814, 395.102459099))
        make_face(mode=Mode.SUBTRACT)
        with BuildLine():
            ThreePointArc((282.284462808, 358.462553119), (279.235178626, 350.120941928), (278.2, 341.3))
            Line((278.2, 341.3), (278.2, 297.854935982))
            ThreePointArc((278.2, 297.854935982), (270.94209821, 286.380025652), (257.464005186, 288.020670003))
            Line((257.464005186, 288.020670003), (49.87538072, 457.650118027))
            ThreePointArc((49.87538072, 457.650118027), (45.227339921, 466.847798927), (48.931119413, 476.464640127))
            Line((48.931119413, 476.464640127), (51.713147519, 479.246668232))
            ThreePointArc((51.713147519, 479.246668232), (58.68186852, 482.80609817), (66.414254679, 481.604924508))
            Line((66.414254679, 481.604924508), (276.666801451, 375.521916556))
            ThreePointArc((276.666801451, 375.521916556), (283.00874198, 368.155690599), (282.284462808, 358.462553119))
        make_face(mode=Mode.SUBTRACT)
        with Locations((372.179031838, 208.543385896)):
            Circle(CONVERT_FLANGE_TO_SHEET_OUTLINE_R, mode=Mode.SUBTRACT)
        with Locations((524.843385896, 55.879031838)):
            Circle(CONVERT_FLANGE_TO_SHEET_OUTLINE_R, mode=Mode.SUBTRACT)
        with Locations((468.964354058, 152.664354058)):
            Circle(CONVERT_FLANGE_TO_SHEET_OUTLINE_R, mode=Mode.SUBTRACT)
        with Locations((316.3, 341.3)):
            Circle(CONVERT_FLANGE_TO_SHEET_OUTLINE_R_2, mode=Mode.SUBTRACT)
    extrude(amount=CONVERT_FLANGE_TO_SHEET_DEPTH)


solid = Compound([body_2.part, body_3.part])
